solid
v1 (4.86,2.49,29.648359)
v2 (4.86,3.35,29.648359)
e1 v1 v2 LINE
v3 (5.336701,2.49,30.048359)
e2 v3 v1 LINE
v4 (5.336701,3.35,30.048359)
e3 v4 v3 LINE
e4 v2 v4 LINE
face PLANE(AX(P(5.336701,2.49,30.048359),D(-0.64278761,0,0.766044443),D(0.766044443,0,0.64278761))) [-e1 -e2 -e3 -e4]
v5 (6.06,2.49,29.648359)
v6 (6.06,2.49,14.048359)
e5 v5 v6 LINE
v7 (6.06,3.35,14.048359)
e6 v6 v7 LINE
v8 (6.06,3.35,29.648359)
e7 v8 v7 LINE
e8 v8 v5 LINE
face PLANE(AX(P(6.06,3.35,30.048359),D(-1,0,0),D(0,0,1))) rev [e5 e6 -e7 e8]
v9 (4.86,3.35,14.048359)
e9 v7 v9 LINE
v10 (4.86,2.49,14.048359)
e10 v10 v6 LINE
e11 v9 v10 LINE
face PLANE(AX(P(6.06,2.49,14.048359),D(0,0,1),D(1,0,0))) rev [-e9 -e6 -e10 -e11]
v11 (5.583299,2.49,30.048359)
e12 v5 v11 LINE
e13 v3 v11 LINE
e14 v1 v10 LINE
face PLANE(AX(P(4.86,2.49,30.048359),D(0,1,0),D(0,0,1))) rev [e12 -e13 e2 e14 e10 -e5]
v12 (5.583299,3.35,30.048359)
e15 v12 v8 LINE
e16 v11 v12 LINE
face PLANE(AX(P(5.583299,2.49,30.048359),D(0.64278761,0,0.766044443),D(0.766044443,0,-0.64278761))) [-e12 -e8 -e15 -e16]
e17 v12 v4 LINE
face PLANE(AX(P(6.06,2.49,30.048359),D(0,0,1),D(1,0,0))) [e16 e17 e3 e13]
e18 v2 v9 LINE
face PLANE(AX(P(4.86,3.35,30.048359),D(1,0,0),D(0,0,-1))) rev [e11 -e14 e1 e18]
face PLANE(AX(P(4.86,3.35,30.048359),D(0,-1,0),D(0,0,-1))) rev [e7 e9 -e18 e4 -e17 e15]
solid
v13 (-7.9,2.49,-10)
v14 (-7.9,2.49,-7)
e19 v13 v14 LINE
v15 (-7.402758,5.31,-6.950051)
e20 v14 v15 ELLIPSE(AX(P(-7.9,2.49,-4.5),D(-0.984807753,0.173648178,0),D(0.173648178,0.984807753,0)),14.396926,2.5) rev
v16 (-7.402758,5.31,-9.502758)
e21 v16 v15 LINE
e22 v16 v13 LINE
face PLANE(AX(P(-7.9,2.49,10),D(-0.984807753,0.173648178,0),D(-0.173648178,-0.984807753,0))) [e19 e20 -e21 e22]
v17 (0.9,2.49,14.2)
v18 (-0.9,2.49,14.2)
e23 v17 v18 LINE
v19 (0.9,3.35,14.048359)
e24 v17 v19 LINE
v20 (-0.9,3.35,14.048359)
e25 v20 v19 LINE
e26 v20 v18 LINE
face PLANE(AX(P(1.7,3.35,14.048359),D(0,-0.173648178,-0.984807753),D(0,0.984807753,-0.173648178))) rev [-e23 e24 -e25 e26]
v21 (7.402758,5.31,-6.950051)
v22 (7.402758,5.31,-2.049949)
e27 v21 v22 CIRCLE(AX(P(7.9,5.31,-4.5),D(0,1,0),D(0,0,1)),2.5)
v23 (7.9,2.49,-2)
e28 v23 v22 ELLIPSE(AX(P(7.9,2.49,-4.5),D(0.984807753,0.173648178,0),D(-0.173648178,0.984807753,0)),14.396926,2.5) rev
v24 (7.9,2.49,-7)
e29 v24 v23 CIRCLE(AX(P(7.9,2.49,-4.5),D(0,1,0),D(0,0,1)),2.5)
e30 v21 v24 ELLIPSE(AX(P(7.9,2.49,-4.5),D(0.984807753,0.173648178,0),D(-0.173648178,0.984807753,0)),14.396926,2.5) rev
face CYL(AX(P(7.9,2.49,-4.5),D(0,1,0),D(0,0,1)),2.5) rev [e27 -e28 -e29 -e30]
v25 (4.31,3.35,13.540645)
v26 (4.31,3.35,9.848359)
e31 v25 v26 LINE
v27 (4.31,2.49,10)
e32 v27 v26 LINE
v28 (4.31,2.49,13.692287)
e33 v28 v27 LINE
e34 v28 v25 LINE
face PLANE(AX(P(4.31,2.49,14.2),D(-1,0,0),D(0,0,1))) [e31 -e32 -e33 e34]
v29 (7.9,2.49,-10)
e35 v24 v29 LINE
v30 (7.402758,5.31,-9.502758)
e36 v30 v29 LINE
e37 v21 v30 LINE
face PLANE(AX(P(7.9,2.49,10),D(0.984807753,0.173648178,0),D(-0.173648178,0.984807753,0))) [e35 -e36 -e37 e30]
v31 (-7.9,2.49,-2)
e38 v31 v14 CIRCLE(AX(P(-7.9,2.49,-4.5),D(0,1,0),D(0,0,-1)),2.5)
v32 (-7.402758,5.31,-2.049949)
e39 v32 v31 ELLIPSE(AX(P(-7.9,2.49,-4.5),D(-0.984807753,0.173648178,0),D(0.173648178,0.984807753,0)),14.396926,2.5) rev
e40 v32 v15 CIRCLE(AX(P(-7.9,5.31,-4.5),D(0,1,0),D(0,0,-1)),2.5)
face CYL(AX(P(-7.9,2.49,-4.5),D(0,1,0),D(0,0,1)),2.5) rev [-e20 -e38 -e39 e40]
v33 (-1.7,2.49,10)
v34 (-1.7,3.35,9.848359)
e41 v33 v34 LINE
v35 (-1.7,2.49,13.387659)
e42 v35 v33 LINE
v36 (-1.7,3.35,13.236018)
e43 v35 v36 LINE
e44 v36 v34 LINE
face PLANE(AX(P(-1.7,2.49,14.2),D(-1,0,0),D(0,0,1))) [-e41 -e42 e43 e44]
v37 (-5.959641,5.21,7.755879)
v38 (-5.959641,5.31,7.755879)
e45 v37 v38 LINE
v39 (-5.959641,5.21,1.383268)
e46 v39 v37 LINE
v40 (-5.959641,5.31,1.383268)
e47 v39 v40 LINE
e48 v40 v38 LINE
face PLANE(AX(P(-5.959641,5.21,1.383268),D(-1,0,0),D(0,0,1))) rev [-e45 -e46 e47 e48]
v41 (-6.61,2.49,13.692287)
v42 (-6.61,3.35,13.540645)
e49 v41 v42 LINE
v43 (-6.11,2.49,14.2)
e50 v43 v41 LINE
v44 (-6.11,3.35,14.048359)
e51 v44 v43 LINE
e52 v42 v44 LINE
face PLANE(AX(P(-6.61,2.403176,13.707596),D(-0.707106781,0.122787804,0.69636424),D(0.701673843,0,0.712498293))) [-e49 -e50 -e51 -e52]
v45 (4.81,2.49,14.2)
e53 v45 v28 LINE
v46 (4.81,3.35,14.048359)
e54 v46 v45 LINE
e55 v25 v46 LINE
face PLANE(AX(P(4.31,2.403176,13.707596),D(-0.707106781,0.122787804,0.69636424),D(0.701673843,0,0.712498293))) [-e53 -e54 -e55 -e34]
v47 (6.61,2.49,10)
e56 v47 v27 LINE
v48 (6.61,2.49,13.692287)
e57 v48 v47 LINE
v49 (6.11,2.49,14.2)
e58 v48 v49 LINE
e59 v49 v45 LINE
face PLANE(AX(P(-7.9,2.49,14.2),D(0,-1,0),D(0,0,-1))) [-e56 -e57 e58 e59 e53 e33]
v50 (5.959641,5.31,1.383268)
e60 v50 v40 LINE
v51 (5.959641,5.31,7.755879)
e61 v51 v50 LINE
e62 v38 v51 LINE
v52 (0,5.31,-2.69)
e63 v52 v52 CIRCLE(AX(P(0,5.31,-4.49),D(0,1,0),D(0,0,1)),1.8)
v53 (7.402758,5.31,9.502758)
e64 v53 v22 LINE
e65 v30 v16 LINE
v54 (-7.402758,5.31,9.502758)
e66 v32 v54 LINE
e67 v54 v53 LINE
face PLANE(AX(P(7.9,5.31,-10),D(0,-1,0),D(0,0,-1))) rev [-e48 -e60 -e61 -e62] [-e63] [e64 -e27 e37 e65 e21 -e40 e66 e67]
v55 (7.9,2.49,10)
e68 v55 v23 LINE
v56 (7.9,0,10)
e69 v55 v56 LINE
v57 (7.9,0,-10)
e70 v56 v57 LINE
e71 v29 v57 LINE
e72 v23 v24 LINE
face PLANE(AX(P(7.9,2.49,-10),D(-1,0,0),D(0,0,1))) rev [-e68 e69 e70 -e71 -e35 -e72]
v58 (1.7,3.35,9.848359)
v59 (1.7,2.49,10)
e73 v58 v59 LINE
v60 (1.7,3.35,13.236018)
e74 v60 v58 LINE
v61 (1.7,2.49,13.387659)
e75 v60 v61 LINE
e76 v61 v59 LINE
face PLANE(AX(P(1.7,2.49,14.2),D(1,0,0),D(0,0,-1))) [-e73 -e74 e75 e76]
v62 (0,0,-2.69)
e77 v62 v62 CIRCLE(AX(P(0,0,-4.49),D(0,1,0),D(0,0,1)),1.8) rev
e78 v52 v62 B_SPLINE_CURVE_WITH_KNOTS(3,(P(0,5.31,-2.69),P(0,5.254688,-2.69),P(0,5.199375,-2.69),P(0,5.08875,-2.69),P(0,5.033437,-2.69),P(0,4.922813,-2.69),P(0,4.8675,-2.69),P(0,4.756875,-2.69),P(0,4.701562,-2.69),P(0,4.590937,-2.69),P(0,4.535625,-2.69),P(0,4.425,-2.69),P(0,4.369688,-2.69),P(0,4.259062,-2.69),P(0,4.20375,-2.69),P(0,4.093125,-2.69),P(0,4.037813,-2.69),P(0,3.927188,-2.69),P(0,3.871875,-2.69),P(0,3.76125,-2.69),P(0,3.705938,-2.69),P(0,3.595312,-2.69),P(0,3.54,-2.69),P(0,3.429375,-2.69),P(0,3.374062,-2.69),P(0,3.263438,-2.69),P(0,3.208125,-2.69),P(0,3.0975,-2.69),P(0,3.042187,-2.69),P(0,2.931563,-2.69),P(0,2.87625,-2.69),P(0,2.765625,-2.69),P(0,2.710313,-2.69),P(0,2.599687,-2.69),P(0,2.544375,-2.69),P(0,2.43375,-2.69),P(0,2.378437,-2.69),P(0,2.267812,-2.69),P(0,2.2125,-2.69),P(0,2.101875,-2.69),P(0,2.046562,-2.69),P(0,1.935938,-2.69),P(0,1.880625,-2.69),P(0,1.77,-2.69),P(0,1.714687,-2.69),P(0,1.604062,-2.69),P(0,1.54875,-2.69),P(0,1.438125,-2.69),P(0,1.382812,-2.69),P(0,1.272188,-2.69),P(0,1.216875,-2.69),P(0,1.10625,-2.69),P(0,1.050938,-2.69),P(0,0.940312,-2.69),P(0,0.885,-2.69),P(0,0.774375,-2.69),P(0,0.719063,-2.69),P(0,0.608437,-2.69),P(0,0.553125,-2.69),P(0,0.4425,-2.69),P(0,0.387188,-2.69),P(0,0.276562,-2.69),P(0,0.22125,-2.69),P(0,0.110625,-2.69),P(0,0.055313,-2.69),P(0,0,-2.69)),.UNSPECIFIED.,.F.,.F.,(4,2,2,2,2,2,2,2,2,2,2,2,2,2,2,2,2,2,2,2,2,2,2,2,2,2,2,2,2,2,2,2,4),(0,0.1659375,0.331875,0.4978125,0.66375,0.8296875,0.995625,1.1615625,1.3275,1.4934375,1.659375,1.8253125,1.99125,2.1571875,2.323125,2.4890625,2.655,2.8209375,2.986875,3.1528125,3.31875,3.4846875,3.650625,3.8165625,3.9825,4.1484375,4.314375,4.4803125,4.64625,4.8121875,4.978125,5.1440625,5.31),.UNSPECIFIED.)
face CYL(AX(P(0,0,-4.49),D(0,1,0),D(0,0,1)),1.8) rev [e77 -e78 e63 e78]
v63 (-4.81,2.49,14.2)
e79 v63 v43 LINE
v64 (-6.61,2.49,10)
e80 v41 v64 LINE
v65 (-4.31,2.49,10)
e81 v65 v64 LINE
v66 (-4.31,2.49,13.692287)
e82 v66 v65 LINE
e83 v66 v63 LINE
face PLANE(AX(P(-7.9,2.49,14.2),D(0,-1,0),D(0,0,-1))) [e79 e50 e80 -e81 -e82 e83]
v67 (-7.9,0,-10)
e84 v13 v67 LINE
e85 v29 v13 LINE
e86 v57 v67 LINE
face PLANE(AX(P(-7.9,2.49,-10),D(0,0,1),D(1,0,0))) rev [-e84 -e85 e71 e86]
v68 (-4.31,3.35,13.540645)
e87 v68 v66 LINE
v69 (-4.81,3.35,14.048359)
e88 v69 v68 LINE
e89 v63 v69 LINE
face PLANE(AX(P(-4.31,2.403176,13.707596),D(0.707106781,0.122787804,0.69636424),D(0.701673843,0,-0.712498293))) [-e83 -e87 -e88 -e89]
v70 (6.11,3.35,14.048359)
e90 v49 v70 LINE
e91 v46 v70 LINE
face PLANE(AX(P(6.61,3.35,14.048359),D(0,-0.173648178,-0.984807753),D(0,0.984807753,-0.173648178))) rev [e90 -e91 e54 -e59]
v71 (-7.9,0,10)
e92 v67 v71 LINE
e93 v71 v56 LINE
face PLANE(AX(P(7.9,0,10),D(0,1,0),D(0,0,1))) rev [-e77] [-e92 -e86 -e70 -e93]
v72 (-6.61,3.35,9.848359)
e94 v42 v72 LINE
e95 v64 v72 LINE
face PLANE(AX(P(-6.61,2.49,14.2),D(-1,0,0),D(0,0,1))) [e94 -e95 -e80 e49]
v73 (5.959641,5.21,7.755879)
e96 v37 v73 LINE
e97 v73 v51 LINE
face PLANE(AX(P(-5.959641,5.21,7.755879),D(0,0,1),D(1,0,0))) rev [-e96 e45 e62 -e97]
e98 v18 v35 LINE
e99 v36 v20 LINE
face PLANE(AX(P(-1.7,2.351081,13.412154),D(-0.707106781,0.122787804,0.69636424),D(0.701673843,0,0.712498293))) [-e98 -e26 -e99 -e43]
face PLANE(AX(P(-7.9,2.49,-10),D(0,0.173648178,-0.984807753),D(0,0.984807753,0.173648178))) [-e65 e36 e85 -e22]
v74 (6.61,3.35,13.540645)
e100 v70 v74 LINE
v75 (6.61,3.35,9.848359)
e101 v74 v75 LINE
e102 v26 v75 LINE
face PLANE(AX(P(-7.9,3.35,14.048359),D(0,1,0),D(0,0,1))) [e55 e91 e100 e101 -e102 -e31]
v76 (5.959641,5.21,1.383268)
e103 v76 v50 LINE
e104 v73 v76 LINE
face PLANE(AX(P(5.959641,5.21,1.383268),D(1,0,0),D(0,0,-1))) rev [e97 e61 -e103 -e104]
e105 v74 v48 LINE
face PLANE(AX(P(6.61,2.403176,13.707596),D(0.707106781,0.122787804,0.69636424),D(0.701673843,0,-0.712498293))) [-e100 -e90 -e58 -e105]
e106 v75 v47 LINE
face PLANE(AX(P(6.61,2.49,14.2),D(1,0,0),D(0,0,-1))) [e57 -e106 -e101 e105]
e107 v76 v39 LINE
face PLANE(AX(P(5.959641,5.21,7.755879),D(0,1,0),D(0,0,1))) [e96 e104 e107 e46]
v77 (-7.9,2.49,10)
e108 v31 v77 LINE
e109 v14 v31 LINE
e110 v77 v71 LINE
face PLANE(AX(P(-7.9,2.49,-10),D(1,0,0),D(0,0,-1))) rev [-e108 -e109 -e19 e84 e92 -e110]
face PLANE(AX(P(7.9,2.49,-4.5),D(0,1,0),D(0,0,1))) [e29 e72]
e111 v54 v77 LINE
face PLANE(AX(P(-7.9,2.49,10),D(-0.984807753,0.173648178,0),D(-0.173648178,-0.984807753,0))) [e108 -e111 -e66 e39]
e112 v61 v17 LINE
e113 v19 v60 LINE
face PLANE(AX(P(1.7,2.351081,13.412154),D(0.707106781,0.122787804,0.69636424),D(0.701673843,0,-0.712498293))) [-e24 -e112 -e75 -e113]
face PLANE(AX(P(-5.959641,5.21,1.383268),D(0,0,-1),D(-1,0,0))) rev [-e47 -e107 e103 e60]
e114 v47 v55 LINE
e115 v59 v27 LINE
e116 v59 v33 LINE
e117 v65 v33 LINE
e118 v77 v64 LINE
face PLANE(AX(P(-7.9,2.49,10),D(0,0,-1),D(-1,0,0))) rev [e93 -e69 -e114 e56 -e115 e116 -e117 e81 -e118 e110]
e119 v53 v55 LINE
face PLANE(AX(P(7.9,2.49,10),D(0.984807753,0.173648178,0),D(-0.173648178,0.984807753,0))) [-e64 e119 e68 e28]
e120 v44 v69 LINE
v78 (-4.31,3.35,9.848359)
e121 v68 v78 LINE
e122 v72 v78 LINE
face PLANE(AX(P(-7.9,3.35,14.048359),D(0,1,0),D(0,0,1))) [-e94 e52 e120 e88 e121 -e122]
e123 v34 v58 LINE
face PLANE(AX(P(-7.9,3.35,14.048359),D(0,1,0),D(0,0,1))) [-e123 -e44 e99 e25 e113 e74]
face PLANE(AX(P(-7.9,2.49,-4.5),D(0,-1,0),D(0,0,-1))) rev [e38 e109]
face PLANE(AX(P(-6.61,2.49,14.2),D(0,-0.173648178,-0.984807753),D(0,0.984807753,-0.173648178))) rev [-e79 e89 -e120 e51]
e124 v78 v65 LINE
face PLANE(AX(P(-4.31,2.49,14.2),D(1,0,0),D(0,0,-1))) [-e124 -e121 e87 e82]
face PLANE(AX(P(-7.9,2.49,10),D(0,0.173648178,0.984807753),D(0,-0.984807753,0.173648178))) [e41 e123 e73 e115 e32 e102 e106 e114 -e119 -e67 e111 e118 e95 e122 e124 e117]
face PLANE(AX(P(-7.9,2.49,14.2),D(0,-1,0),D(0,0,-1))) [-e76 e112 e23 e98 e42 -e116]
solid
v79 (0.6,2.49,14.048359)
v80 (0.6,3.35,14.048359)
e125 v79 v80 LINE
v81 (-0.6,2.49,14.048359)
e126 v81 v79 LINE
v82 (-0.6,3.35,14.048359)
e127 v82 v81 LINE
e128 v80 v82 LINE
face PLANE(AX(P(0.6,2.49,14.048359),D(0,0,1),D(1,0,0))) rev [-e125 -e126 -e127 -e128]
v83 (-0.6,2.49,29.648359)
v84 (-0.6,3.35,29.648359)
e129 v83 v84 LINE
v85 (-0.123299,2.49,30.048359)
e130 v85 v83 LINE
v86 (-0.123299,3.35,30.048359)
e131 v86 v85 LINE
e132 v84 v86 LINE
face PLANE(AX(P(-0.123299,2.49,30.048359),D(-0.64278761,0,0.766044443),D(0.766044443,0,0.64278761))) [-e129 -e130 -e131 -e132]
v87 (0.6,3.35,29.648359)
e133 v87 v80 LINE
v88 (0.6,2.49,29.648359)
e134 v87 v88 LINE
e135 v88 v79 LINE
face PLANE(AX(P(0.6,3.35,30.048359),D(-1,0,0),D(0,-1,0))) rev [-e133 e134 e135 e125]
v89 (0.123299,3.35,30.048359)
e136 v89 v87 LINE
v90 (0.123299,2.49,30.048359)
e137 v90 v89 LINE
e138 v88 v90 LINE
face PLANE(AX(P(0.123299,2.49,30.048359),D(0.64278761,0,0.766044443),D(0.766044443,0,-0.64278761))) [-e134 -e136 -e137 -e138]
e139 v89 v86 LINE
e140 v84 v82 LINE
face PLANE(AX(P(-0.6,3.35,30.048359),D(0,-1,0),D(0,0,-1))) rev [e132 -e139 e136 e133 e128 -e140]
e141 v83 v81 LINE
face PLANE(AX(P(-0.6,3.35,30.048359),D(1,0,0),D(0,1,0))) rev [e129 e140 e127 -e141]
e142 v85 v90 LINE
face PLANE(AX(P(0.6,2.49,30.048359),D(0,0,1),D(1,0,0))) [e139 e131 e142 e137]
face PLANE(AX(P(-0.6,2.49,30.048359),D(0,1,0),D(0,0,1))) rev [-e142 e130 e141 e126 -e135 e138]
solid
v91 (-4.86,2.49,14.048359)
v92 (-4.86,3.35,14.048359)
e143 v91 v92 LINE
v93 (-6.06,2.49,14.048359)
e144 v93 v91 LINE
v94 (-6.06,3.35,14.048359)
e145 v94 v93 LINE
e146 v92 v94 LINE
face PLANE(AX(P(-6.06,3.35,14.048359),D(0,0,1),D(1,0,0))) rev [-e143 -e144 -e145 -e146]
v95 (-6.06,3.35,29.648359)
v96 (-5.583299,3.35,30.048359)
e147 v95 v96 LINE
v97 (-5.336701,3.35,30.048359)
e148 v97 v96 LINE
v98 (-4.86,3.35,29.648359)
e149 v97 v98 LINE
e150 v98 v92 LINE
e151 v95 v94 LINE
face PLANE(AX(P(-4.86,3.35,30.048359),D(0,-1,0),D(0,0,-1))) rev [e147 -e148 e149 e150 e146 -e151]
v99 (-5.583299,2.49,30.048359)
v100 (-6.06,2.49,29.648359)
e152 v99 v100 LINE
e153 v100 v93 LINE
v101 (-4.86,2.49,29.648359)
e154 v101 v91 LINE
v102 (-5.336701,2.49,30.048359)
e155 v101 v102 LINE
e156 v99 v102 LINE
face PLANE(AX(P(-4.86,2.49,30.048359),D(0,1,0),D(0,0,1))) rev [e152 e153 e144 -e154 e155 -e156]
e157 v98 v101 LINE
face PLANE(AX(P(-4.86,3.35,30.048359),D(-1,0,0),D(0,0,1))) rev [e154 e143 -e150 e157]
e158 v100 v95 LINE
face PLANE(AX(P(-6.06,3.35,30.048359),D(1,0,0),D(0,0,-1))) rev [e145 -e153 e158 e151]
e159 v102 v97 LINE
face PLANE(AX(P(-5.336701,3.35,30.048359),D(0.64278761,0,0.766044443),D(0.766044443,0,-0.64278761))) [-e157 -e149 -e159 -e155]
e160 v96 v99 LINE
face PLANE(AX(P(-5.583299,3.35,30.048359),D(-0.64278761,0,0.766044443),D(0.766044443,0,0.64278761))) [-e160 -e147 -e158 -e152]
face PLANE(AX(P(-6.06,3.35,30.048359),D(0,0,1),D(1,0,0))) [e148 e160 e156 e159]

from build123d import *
from OCP.BRepFilletAPI import BRepFilletAPI_MakeChamfer

# Parameters (mm, degrees)
SKETCH1_W             = 15.8
SKETCH1_H             = 20
BOSS_EXTRUDE1_DEPTH   = 2.49
SKETCH2_W             = 15.8
SKETCH2_H             = 20
BOSS_EXTRUDE3_DEPTH   = 2.82
BOSS_EXTRUDE3_TAPER   = 10
BOSS_EXTRUDE4_START   = -1.7
BOSS_EXTRUDE4_DEPTH   = 3.4
BOSS_EXTRUDE4_START_2 = -6.61
BOSS_EXTRUDE4_2_DEPTH = 2.3
BOSS_EXTRUDE4_START_3 = 4.31
BOSS_EXTRUDE4_3_DEPTH = 2.3
BOSS_EXTRUDE6_START   = 14.04836
SKETCH5_W             = 1.2
SKETCH5_H             = 0.86
BOSS_EXTRUDE6_DEPTH   = 16
BOSS_EXTRUDE6_2_DEPTH = 16
BOSS_EXTRUDE6_3_DEPTH = 16
SKETCH6_R             = 1.8
CUT_EXTRUDE1_DEPTH    = 32.519994294
SKETCH7_R             = 2.5
CUT_EXTRUDE2_DEPTH    = 2.82
CHAMFER2_SIZE         = 0.5
CHAMFER3_SIZE         = 0.8
CHAMFER7_SIZE         = 0.4
CHAMFER7_SIZE2        = 0.476701437
CHAMFER8_SIZE         = 0.4
CHAMFER8_SIZE2        = 0.476701437
CHAMFER9_SIZE         = 0.4
CHAMFER9_SIZE2        = 0.476701437
SKETCH9_W             = 12.986336946
SKETCH9_H             = 15.440559179
CUT_EXTRUDE3_DEPTH    = 2.49
SKETCH10_W            = 12.986336946
SKETCH10_H            = 15.440559179
BOSS_EXTRUDE7_DEPTH   = 2.49
SKETCH13_R            = 1.8
CUT_EXTRUDE4_DEPTH    = 2.49
SKETCH14_W            = 11.919281888
SKETCH14_H            = 6.372610916
CUT_EXTRUDE5_DEPTH    = 0.1


# Read off the part's stored shape, not the designer's step: Boss-Extrude4
with BuildPart() as part:
    # Sketch1 → Boss-Extrude1 (new body)
    with BuildSketch(Plane(origin=(0, 0, 0), x_dir=(1, 0, 0), z_dir=(0, 1, 0))):
        Rectangle(SKETCH1_W, SKETCH1_H)
    extrude(amount=BOSS_EXTRUDE1_DEPTH)

    # Sketch2 → Boss-Extrude3 (add)
    with BuildSketch(Plane(origin=(0, 2.49, 0), x_dir=(1, 0, 0), z_dir=(0, 1, 0))):
        Rectangle(SKETCH2_W, SKETCH2_H)
    extrude(amount=BOSS_EXTRUDE3_DEPTH, taper=BOSS_EXTRUDE3_TAPER)

    # Boss-Extrude4 outline → Boss-Extrude4 (add)
    with BuildSketch(Plane.YZ.offset(BOSS_EXTRUDE4_START)):
        Polygon((2.49, 10), (3.35, 9.848358796), (3.35, 14.048358797), (2.49, 14.2), align=None)
    extrude(amount=BOSS_EXTRUDE4_DEPTH)

    # Boss-Extrude4 2 outline → Boss-Extrude4 2 (add)
    with BuildSketch(Plane.YZ.offset(BOSS_EXTRUDE4_START_2)):
        Polygon((2.49, 10), (3.35, 9.848358796), (3.35, 14.048358797), (2.49, 14.2), align=None)
    extrude(amount=BOSS_EXTRUDE4_2_DEPTH)

    # Boss-Extrude4 3 outline → Boss-Extrude4 3 (add)
    with BuildSketch(Plane.YZ.offset(BOSS_EXTRUDE4_START_3)):
        Polygon((2.49, 10), (3.35, 9.848358796), (3.35, 14.048358797), (2.49, 14.2), align=None)
    extrude(amount=BOSS_EXTRUDE4_3_DEPTH)

    # Sketch6 → Cut-Extrude1 (cut, through all)
    with BuildSketch(Plane(origin=(0, 5.31, 0), x_dir=(1, 0, 0), z_dir=(0, 1, 0))):
        with Locations(Location((0, 4.49, 0), (0, 0, 270))):
            Circle(SKETCH6_R)
    extrude(amount=-CUT_EXTRUDE1_DEPTH, mode=Mode.SUBTRACT)

    # Sketch7 → Cut-Extrude2 (cut)
    with BuildSketch(Plane(origin=(0, 5.31, 0), x_dir=(1, 0, 0), z_dir=(0, 1, 0))):
        with Locations((7.9, 4.5)):
            Circle(SKETCH7_R)
        with Locations((-7.9, 4.5)):
            Circle(SKETCH7_R)
    extrude(amount=-CUT_EXTRUDE2_DEPTH, mode=Mode.SUBTRACT)

    # Chamfer2
    chamfer2_edges = [part.edges().sort_by_distance(p)[0] for p in [
        (4.31, 2.92, 14.124179399),
        (6.61, 2.92, 14.124179399),
        (-4.31, 2.92, 14.124179399),
        (-6.61, 2.92, 14.124179399),
    ]]
    chamfer(chamfer2_edges, length=CHAMFER2_SIZE)

    # Chamfer3
    chamfer3_edges = [part.edges().sort_by_distance(p)[0] for p in [
        (1.7, 2.92, 14.124179399),
        (-1.7, 2.92, 14.124179399),
    ]]
    chamfer(chamfer3_edges, length=CHAMFER3_SIZE)

    # Sketch9 → Cut-Extrude3 (cut)
    with BuildSketch(Plane.XZ):
        with Locations((0, -0.672147613)):
            Rectangle(SKETCH9_W, SKETCH9_H)
    extrude(amount=-CUT_EXTRUDE3_DEPTH, mode=Mode.SUBTRACT)

    # Sketch10 → Boss-Extrude7 (add)
    with BuildSketch(Plane.XZ.offset(-2.49)):
        with Locations((0, -0.672147613)):
            Rectangle(SKETCH10_W, SKETCH10_H)
    extrude(amount=BOSS_EXTRUDE7_DEPTH)

    # Sketch13 → Cut-Extrude4 (cut)
    with BuildSketch(Plane(origin=(0, 2.49, 0), x_dir=(1, 0, 0), z_dir=(0, 1, 0))):
        with Locations(Location((0, 4.49, 0), (0, 0, 270))):
            Circle(SKETCH13_R)
    extrude(amount=-CUT_EXTRUDE4_DEPTH, mode=Mode.SUBTRACT)

    # Sketch14 → Cut-Extrude5 (cut)
    with BuildSketch(Plane(origin=(0, 5.31, 0), x_dir=(1, 0, 0), z_dir=(0, 1, 0))):
        with Locations((0, -4.569573217)):
            Rectangle(SKETCH14_W, SKETCH14_H)
    extrude(amount=-CUT_EXTRUDE5_DEPTH, mode=Mode.SUBTRACT)


with BuildPart() as body_2:
    # Sketch5 → Boss-Extrude6 (new body)
    with BuildSketch(Plane.XY.offset(BOSS_EXTRUDE6_START)):
        with Locations((0, 2.92)):
            Rectangle(SKETCH5_W, SKETCH5_H)
    extrude(amount=BOSS_EXTRUDE6_DEPTH)

    # Chamfer7: one chamfer whose edges measure the first distance from different faces: ONE call of the kernel's chamfer builder (chamfer() names one face for all edges)
    chamfer7_edges_1 = [body_2.edges().sort_by_distance(p)[0] for p in [
        (-0.6, 2.92, 30.04836),
    ]]
    chamfer7_side_1 = [body_2.faces().sort_by_distance(p)[0] for p in [
        (-0.6, 2.92, 22.04836),
    ]]
    chamfer7_edges_2 = [body_2.edges().sort_by_distance(p)[0] for p in [
        (0.6, 2.92, 30.04836),
    ]]
    chamfer7_side_2 = [body_2.faces().sort_by_distance(p)[0] for p in [
        (0.6, 2.92, 22.04836),
    ]]
    chamfer7 = BRepFilletAPI_MakeChamfer(body_2.part.solid().wrapped)
    for e in chamfer7_edges_1:
        chamfer7.Add(CHAMFER7_SIZE, CHAMFER7_SIZE2, e.wrapped, chamfer7_side_1[0].wrapped)  # the first distance lies on this face
    for e in chamfer7_edges_2:
        chamfer7.Add(CHAMFER7_SIZE, CHAMFER7_SIZE2, e.wrapped, chamfer7_side_2[0].wrapped)  # the first distance lies on this face
    add(Compound.cast(chamfer7.Shape()), mode=Mode.REPLACE)


with BuildPart() as body_3:
    # Sketch5 → Boss-Extrude6 2 (new body)
    with BuildSketch(Plane.XY.offset(BOSS_EXTRUDE6_START)):
        with Locations((5.46, 2.92)):
            Rectangle(SKETCH5_W, SKETCH5_H)
    extrude(amount=BOSS_EXTRUDE6_2_DEPTH)

    # Chamfer9: one chamfer whose edges measure the first distance from different faces: ONE call of the kernel's chamfer builder (chamfer() names one face for all edges)
    chamfer9_edges_1 = [body_3.edges().sort_by_distance(p)[0] for p in [
        (4.86, 2.92, 30.04836),
    ]]
    chamfer9_side_1 = [body_3.faces().sort_by_distance(p)[0] for p in [
        (4.86, 2.92, 22.04836),
    ]]
    chamfer9_edges_2 = [body_3.edges().sort_by_distance(p)[0] for p in [
        (6.06, 2.92, 30.04836),
    ]]
    chamfer9_side_2 = [body_3.faces().sort_by_distance(p)[0] for p in [
        (6.06, 2.92, 22.04836),
    ]]
    chamfer9 = BRepFilletAPI_MakeChamfer(body_3.part.solid().wrapped)
    for e in chamfer9_edges_1:
        chamfer9.Add(CHAMFER9_SIZE, CHAMFER9_SIZE2, e.wrapped, chamfer9_side_1[0].wrapped)  # the first distance lies on this face
    for e in chamfer9_edges_2:
        chamfer9.Add(CHAMFER9_SIZE, CHAMFER9_SIZE2, e.wrapped, chamfer9_side_2[0].wrapped)  # the first distance lies on this face
    add(Compound.cast(chamfer9.Shape()), mode=Mode.REPLACE)


with BuildPart() as body_4:
    # Sketch5 → Boss-Extrude6 3 (new body)
    with BuildSketch(Plane.XY.offset(BOSS_EXTRUDE6_START)):
        with Locations((-5.46, 2.92)):
            Rectangle(SKETCH5_W, SKETCH5_H)
    extrude(amount=BOSS_EXTRUDE6_3_DEPTH)

    # Chamfer8: one chamfer whose edges measure the first distance from different faces: ONE call of the kernel's chamfer builder (chamfer() names one face for all edges)
    chamfer8_edges_1 = [body_4.edges().sort_by_distance(p)[0] for p in [
        (-4.86, 2.92, 30.04836),
    ]]
    chamfer8_side_1 = [body_4.faces().sort_by_distance(p)[0] for p in [
        (-4.86, 2.92, 22.04836),
    ]]
    chamfer8_edges_2 = [body_4.edges().sort_by_distance(p)[0] for p in [
        (-6.06, 2.92, 30.04836),
    ]]
    chamfer8_side_2 = [body_4.faces().sort_by_distance(p)[0] for p in [
        (-6.06, 2.92, 22.04836),
    ]]
    chamfer8 = BRepFilletAPI_MakeChamfer(body_4.part.solid().wrapped)
    for e in chamfer8_edges_1:
        chamfer8.Add(CHAMFER8_SIZE, CHAMFER8_SIZE2, e.wrapped, chamfer8_side_1[0].wrapped)  # the first distance lies on this face
    for e in chamfer8_edges_2:
        chamfer8.Add(CHAMFER8_SIZE, CHAMFER8_SIZE2, e.wrapped, chamfer8_side_2[0].wrapped)  # the first distance lies on this face
    add(Compound.cast(chamfer8.Shape()), mode=Mode.REPLACE)


solid = Compound([part.part, body_2.part, body_3.part, body_4.part])
